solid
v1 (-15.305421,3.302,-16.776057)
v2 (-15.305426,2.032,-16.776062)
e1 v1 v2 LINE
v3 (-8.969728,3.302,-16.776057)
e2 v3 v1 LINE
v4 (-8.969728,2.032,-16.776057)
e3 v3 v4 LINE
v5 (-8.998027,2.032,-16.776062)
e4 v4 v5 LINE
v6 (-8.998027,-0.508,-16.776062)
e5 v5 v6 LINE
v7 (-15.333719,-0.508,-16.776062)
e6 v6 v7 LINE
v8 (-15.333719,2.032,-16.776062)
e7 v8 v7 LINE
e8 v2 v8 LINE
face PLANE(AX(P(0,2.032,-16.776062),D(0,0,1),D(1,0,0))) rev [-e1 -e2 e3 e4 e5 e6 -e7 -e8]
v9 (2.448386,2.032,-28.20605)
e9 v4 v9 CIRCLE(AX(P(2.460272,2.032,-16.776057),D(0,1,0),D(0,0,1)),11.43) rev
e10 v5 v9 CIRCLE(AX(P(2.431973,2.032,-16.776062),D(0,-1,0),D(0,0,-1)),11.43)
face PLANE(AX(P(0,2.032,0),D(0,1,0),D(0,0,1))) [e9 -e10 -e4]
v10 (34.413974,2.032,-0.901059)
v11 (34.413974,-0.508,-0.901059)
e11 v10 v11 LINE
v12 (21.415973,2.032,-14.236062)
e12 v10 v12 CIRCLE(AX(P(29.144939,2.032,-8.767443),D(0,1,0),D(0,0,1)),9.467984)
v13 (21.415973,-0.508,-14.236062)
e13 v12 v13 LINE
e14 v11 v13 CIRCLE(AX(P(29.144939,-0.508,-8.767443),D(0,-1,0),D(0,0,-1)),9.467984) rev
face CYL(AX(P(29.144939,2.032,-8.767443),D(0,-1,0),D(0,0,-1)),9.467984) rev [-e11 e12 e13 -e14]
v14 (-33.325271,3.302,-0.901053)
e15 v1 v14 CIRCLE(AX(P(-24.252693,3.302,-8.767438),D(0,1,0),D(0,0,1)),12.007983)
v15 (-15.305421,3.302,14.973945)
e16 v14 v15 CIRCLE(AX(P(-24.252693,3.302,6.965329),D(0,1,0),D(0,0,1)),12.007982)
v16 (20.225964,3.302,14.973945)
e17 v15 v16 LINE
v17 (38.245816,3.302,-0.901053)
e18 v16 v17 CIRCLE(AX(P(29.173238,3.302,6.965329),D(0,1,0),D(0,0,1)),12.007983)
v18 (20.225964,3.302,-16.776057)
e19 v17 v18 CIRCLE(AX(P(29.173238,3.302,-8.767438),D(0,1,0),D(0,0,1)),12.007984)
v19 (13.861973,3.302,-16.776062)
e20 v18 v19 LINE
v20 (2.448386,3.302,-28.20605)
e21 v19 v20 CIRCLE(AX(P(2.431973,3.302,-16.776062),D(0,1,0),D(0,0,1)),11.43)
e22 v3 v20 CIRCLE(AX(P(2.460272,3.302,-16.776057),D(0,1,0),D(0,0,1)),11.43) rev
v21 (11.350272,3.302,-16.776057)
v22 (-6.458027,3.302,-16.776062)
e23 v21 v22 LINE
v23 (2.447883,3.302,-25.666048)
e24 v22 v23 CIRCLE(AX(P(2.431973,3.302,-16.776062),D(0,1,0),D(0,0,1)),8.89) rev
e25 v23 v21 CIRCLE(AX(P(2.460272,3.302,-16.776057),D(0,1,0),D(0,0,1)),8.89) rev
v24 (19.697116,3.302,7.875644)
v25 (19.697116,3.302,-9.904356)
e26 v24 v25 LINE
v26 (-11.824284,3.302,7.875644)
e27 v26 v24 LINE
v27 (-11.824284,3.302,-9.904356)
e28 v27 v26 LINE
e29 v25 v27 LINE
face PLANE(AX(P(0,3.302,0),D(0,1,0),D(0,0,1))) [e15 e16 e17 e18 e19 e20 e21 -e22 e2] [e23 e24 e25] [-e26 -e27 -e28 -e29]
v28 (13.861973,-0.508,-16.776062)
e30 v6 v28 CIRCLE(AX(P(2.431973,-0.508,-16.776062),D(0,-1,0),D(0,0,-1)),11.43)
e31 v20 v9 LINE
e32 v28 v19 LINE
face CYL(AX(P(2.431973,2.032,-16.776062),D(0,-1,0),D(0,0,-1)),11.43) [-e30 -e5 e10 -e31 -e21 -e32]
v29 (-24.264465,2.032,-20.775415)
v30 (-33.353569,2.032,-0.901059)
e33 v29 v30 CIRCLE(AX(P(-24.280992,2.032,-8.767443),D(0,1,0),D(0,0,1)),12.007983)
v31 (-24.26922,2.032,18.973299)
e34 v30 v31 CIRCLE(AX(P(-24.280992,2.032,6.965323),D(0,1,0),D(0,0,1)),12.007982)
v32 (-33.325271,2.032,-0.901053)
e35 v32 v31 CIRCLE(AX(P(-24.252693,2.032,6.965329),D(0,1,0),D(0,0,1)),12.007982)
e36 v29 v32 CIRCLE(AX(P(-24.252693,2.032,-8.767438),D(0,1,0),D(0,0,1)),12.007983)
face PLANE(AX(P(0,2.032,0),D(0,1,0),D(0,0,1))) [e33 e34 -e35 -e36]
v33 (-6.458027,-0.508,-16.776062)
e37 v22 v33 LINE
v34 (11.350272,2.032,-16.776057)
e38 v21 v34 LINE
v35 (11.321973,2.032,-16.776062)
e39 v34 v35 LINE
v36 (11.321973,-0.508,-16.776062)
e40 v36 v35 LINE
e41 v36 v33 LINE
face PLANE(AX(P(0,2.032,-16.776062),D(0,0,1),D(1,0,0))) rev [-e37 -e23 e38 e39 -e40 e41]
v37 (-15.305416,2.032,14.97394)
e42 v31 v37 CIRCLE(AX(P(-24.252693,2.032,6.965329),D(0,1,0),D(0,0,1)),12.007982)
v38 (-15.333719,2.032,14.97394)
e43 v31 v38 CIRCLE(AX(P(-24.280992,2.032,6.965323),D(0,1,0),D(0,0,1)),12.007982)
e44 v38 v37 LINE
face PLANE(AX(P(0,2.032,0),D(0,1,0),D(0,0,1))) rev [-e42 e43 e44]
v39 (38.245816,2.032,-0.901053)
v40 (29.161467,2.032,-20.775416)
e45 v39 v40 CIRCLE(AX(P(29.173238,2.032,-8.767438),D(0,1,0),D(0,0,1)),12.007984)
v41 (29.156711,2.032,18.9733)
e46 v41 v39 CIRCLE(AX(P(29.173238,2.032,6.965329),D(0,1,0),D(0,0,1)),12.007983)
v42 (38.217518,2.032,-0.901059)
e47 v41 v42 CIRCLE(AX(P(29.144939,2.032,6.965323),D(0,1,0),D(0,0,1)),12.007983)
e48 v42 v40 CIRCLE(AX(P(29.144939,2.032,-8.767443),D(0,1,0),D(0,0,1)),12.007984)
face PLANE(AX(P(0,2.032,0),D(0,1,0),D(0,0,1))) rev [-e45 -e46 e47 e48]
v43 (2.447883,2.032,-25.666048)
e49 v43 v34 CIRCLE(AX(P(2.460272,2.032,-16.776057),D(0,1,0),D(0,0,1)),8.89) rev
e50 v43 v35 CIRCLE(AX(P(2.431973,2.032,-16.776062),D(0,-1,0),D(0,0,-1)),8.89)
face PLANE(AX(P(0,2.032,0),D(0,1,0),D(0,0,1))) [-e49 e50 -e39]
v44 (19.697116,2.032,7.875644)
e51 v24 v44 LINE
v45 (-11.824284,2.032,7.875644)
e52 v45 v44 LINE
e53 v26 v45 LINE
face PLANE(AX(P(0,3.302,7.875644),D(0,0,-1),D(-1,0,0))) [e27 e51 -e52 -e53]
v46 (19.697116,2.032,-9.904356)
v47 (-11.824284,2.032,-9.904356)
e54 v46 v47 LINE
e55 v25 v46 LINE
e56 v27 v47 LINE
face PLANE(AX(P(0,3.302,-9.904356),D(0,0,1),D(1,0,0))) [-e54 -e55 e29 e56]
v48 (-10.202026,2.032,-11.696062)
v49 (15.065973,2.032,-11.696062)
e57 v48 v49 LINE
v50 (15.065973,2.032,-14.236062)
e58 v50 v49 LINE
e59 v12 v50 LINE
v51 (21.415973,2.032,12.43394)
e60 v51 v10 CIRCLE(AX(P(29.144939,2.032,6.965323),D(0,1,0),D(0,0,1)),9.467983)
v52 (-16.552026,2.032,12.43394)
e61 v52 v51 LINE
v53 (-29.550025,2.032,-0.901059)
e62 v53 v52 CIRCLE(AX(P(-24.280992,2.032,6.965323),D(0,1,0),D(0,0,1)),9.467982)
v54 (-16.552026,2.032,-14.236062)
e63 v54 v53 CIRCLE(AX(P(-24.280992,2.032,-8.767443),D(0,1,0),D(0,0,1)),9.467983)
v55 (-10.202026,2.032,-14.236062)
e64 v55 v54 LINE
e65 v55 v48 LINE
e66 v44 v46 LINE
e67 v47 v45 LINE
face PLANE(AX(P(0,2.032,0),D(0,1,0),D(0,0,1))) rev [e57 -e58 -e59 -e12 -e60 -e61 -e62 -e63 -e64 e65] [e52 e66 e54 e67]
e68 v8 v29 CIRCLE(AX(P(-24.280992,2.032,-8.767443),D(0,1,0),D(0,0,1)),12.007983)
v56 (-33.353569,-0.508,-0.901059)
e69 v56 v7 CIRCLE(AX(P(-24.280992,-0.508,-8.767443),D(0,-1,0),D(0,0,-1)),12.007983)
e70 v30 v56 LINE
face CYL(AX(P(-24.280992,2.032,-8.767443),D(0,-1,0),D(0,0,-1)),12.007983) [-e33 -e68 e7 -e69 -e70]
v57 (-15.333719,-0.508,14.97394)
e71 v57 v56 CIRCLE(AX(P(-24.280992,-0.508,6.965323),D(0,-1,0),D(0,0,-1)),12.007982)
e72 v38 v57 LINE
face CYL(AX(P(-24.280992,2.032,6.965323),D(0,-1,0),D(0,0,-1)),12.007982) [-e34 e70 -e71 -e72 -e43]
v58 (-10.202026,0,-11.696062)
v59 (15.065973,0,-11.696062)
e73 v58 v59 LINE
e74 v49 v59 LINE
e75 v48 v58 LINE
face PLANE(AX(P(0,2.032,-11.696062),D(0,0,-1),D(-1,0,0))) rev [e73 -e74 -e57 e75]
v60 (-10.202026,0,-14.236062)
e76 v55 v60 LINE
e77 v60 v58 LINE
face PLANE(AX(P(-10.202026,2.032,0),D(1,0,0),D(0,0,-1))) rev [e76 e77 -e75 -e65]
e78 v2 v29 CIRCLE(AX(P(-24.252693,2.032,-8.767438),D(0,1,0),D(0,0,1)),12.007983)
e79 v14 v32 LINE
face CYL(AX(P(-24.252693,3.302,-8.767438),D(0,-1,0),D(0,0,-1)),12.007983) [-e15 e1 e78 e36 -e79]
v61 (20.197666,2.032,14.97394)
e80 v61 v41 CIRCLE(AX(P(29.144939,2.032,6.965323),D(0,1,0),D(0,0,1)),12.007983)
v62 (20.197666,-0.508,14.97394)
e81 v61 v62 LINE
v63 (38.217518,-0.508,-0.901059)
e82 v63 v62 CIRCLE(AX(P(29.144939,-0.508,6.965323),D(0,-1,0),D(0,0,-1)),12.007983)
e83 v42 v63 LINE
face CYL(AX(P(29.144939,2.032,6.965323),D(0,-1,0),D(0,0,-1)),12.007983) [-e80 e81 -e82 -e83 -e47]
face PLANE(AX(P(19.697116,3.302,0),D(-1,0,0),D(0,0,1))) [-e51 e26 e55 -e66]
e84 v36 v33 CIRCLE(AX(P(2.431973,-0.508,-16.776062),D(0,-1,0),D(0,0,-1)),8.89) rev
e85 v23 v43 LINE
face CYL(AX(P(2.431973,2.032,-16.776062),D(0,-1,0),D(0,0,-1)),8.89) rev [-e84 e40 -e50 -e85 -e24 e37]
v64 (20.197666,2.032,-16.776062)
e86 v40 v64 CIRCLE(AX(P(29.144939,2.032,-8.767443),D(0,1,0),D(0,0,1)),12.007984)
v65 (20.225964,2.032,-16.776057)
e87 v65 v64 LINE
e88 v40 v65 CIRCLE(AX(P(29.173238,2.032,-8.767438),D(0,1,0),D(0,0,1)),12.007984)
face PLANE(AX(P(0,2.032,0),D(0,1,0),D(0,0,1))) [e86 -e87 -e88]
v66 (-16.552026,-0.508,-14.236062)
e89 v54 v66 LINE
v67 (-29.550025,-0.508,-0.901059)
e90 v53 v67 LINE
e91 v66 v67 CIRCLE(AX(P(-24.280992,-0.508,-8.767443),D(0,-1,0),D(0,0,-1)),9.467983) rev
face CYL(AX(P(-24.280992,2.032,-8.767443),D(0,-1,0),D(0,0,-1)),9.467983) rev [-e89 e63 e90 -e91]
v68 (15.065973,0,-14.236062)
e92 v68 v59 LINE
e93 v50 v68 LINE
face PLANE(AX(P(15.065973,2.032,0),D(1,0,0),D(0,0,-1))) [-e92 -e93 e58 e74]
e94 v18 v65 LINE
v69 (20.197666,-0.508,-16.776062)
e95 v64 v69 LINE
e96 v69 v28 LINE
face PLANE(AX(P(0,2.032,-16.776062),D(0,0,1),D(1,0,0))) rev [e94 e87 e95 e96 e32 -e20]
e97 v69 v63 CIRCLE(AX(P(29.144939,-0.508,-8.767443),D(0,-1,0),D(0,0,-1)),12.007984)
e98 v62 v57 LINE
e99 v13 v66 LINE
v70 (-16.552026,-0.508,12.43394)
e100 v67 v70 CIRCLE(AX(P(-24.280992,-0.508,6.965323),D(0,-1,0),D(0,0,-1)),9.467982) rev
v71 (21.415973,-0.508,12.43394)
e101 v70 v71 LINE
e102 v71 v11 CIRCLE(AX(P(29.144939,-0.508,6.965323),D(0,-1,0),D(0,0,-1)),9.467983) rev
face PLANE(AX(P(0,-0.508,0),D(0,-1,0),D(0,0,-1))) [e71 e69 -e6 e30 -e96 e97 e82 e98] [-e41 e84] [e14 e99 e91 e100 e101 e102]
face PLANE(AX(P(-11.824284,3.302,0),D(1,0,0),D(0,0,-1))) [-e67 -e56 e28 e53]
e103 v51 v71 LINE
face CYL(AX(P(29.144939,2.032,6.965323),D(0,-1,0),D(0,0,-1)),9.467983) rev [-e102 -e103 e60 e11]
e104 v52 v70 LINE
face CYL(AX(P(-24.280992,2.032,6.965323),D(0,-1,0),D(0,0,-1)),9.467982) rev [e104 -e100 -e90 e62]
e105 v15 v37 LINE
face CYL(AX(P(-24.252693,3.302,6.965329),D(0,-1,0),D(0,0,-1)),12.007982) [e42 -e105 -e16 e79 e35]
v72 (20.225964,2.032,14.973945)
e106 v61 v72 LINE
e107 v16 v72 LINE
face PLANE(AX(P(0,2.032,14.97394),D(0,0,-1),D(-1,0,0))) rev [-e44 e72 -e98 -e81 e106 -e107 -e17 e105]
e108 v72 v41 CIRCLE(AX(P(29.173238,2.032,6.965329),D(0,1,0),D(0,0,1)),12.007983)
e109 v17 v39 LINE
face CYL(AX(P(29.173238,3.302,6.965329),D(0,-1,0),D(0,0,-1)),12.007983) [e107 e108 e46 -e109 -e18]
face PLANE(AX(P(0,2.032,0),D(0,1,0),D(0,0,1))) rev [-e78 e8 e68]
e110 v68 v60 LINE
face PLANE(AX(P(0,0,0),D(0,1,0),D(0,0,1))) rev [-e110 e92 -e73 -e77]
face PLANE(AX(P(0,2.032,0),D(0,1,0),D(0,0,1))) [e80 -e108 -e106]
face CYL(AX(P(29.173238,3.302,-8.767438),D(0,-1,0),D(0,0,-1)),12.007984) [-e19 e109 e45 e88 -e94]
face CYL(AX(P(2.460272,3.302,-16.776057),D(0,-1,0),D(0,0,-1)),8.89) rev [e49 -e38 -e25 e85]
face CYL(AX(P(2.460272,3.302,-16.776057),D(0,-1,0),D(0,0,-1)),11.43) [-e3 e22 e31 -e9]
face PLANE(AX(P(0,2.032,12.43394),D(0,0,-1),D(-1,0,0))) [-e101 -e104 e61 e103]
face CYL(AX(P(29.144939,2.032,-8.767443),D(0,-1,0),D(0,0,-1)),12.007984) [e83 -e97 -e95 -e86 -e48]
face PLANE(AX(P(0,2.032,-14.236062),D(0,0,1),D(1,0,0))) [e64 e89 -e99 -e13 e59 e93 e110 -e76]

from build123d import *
from build123d.topology import SkipClean

# Parameters (mm, degrees)
SKETCH1_W               = 25.267998505
SKETCH1_H               = 2.54
BOSS_EXTRUDE4_DEPTH     = 2.032
BOSS_EXTRUDE7_OUTLINE_W = 31.52140002
BOSS_EXTRUDE7_OUTLINE_H = 17.78
BOSS_EXTRUDE7_DEPTH     = 1.27
BOSS_EXTRUDE8_START     = -0.508
BOSS_EXTRUDE8_DEPTH     = 0.508


# Read off the part's stored shape, not the designer's step: Boss-Extrude7
with BuildPart() as part:
    # Sketch1 → Boss-Extrude4 (new body)
    # profile 1 of 3: a face of its own
    with BuildSketch(Plane(origin=(0, 0, 0), x_dir=(1, 0, 0), z_dir=(0, 1, 0))):
        with BuildLine():
            ThreePointArc((20.197665706, -14.97393985), (37.082685983, -15.975529809), (38.217517737, 0.901058978))
            ThreePointArc((38.217517737, 0.901058978), (37.082688311, 17.777649884), (20.197665941, 16.776062133))
            Line((20.197665941, 16.776062133), (-15.333719311, 16.776062133))
            ThreePointArc((-15.333719311, 16.776062133), (-32.218740701, 17.777648898), (-33.353569348, 0.901058978))
            ThreePointArc((-33.353569348, 0.901058978), (-32.218738374, -15.975528824), (-15.333719076, -14.97393985))
            Line((-15.333719076, -14.97393985), (20.197665706, -14.97393985))
        make_face()
        with BuildLine():
            ThreePointArc((-29.55002508, 0.901059234), (-31.060989267, -13.57397761), (-16.552025889, -12.43393985))
            Line((-16.552025889, -12.43393985), (21.415972616, -12.43393985))
            ThreePointArc((21.415972616, -12.43393985), (35.924936864, -13.573978674), (34.413973715, 0.901059234))
            ThreePointArc((34.413973715, 0.901059234), (35.924938934, 15.376098834), (21.415972616, 14.236062133))
            Line((21.415972616, 14.236062133), (-16.552025889, 14.236062133))
            ThreePointArc((-16.552025889, 14.236062133), (-31.060991337, 15.376097769), (-29.55002508, 0.901059234))
        make_face(mode=Mode.SUBTRACT)
    # profile 2 of 3: a face of its own
    with BuildSketch(Plane(origin=(0, 0, 0), x_dir=(1, 0, 0), z_dir=(0, 1, 0))):
        with Locations((2.431973364, 12.966062133)):
            Rectangle(SKETCH1_W, SKETCH1_H)
    # profile 3 of 3: a face of its own
    with BuildSketch(Plane(origin=(0, 0, 0), x_dir=(1, 0, 0), z_dir=(0, 1, 0))):
        with BuildLine():
            Line((11.321973315, 16.776062133), (13.861973315, 16.776062133))
            ThreePointArc((13.861973315, 16.776062133), (2.431973315, 28.206062133), (-8.998026685, 16.776062133))
            Line((-8.998026685, 16.776062133), (-6.458026685, 16.776062133))
            ThreePointArc((-6.458026685, 16.776062133), (2.431973315, 25.666062133), (11.321973315, 16.776062133))
        make_face()
    extrude(amount=BOSS_EXTRUDE4_DEPTH)

    # Boss-Extrude7 outline → Boss-Extrude7 (add)
    with BuildSketch(Plane(origin=(0, 2.032, 0), x_dir=(1, 0, 0), z_dir=(0, 1, 0))):
        with BuildLine():
            Line((20.225964487, 16.776056529), (13.861973315, 16.776062133))
            ThreePointArc((13.861973315, 16.776062133), (10.520004553, 24.852487746), (2.448386143, 28.206050349))
            ThreePointArc((2.448386143, 28.206050349), (-5.626159792, 24.854083709), (-8.969728139, 16.776056529))
            Line((-8.969728139, 16.776056529), (-15.305420765, 16.776056529))
            ThreePointArc((-15.305420765, 16.776056529), (-32.190442155, 17.777643295), (-33.325270802, 0.901053374))
            ThreePointArc((-33.325270802, 0.901053374), (-32.190437006, -15.975536914), (-15.305415514, -14.97393985))
            Line((-15.305415514, -14.97393985), (20.225964252, -14.973945454))
            ThreePointArc((20.225964252, -14.973945454), (37.110984529, -15.975535414), (38.245816283, 0.901053374))
            ThreePointArc((38.245816283, 0.901053374), (37.110986856, 17.77764428), (20.225964487, 16.776056529))
        make_face()
        with Locations((3.936415724, 1.014356422)):
            Rectangle(BOSS_EXTRUDE7_OUTLINE_W, BOSS_EXTRUDE7_OUTLINE_H, mode=Mode.SUBTRACT)
        with BuildLine():
            Line((11.350271861, 16.776056529), (-6.458026685, 16.776062133))
            ThreePointArc((-6.458026685, 16.776062133), (-3.848578482, 23.067863872), (2.44788313, 25.666047897))
            ThreePointArc((2.44788313, 25.666047897), (8.742069541, 23.066614366), (11.350271861, 16.776056529))
        make_face(mode=Mode.SUBTRACT)
    extrude(amount=BOSS_EXTRUDE7_DEPTH)

    # Sketch4 → Boss-Extrude8 (add)
    # profile 1 of 2: a face of its own
    with SkipClean():  # the faces are left unmerged after this step: merging them gives an invalid solid
        with BuildSketch(Plane(origin=(0, 0, 0), x_dir=(1, 0, 0), z_dir=(0, 1, 0)).offset(BOSS_EXTRUDE8_START)):
            with BuildLine():
                ThreePointArc((-33.353569348, 0.901058978), (-32.218738374, -15.975528824), (-15.333719076, -14.97393985))
                Line((-15.333719076, -14.97393985), (20.197665706, -14.97393985))
                ThreePointArc((20.197665706, -14.97393985), (37.082685983, -15.975529809), (38.217517737, 0.901058978))
                ThreePointArc((38.217517737, 0.901058978), (37.082688311, 17.777649884), (20.197665941, 16.776062133))
                Line((20.197665941, 16.776062133), (13.861973315, 16.776062133))
                Line((13.861973315, 16.776062133), (11.321973315, 16.776062133))
                Line((11.321973315, 16.776062133), (-6.458026685, 16.776062133))
                Line((-6.458026685, 16.776062133), (-8.998026685, 16.776062133))
                Line((-8.998026685, 16.776062133), (-15.333719311, 16.776062133))
                ThreePointArc((-15.333719311, 16.776062133), (-32.218740701, 17.777648898), (-33.353569348, 0.901058978))
            make_face()
            with BuildLine():
                Line((21.415972616, -12.43393985), (-16.552025889, -12.43393985))
                ThreePointArc((-16.552025889, -12.43393985), (-31.060989267, -13.57397761), (-29.55002508, 0.901059234))
                ThreePointArc((-29.55002508, 0.901059234), (-31.060991337, 15.376097769), (-16.552025889, 14.236062133))
                Line((-16.552025889, 14.236062133), (-10.202025889, 14.236062133))
                Line((-10.202025889, 14.236062133), (15.065972616, 14.236062133))
                Line((15.065972616, 14.236062133), (21.415972616, 14.236062133))
                ThreePointArc((21.415972616, 14.236062133), (35.924938934, 15.376098834), (34.413973715, 0.901059234))
                ThreePointArc((34.413973715, 0.901059234), (35.924936864, -13.573978674), (21.415972616, -12.43393985))
            make_face(mode=Mode.SUBTRACT)
        # profile 2 of 2: a face of its own
        with BuildSketch(Plane(origin=(0, 0, 0), x_dir=(1, 0, 0), z_dir=(0, 1, 0)).offset(BOSS_EXTRUDE8_START)):
            with BuildLine():
                ThreePointArc((13.861973315, 16.776062133), (2.431973315, 28.206062133), (-8.998026685, 16.776062133))
                Line((-8.998026685, 16.776062133), (-6.458026685, 16.776062133))
                ThreePointArc((-6.458026685, 16.776062133), (2.431973315, 25.666062133), (11.321973315, 16.776062133))
                Line((11.321973315, 16.776062133), (13.861973315, 16.776062133))
            make_face()
        extrude(amount=BOSS_EXTRUDE8_DEPTH)


solid = part.part
